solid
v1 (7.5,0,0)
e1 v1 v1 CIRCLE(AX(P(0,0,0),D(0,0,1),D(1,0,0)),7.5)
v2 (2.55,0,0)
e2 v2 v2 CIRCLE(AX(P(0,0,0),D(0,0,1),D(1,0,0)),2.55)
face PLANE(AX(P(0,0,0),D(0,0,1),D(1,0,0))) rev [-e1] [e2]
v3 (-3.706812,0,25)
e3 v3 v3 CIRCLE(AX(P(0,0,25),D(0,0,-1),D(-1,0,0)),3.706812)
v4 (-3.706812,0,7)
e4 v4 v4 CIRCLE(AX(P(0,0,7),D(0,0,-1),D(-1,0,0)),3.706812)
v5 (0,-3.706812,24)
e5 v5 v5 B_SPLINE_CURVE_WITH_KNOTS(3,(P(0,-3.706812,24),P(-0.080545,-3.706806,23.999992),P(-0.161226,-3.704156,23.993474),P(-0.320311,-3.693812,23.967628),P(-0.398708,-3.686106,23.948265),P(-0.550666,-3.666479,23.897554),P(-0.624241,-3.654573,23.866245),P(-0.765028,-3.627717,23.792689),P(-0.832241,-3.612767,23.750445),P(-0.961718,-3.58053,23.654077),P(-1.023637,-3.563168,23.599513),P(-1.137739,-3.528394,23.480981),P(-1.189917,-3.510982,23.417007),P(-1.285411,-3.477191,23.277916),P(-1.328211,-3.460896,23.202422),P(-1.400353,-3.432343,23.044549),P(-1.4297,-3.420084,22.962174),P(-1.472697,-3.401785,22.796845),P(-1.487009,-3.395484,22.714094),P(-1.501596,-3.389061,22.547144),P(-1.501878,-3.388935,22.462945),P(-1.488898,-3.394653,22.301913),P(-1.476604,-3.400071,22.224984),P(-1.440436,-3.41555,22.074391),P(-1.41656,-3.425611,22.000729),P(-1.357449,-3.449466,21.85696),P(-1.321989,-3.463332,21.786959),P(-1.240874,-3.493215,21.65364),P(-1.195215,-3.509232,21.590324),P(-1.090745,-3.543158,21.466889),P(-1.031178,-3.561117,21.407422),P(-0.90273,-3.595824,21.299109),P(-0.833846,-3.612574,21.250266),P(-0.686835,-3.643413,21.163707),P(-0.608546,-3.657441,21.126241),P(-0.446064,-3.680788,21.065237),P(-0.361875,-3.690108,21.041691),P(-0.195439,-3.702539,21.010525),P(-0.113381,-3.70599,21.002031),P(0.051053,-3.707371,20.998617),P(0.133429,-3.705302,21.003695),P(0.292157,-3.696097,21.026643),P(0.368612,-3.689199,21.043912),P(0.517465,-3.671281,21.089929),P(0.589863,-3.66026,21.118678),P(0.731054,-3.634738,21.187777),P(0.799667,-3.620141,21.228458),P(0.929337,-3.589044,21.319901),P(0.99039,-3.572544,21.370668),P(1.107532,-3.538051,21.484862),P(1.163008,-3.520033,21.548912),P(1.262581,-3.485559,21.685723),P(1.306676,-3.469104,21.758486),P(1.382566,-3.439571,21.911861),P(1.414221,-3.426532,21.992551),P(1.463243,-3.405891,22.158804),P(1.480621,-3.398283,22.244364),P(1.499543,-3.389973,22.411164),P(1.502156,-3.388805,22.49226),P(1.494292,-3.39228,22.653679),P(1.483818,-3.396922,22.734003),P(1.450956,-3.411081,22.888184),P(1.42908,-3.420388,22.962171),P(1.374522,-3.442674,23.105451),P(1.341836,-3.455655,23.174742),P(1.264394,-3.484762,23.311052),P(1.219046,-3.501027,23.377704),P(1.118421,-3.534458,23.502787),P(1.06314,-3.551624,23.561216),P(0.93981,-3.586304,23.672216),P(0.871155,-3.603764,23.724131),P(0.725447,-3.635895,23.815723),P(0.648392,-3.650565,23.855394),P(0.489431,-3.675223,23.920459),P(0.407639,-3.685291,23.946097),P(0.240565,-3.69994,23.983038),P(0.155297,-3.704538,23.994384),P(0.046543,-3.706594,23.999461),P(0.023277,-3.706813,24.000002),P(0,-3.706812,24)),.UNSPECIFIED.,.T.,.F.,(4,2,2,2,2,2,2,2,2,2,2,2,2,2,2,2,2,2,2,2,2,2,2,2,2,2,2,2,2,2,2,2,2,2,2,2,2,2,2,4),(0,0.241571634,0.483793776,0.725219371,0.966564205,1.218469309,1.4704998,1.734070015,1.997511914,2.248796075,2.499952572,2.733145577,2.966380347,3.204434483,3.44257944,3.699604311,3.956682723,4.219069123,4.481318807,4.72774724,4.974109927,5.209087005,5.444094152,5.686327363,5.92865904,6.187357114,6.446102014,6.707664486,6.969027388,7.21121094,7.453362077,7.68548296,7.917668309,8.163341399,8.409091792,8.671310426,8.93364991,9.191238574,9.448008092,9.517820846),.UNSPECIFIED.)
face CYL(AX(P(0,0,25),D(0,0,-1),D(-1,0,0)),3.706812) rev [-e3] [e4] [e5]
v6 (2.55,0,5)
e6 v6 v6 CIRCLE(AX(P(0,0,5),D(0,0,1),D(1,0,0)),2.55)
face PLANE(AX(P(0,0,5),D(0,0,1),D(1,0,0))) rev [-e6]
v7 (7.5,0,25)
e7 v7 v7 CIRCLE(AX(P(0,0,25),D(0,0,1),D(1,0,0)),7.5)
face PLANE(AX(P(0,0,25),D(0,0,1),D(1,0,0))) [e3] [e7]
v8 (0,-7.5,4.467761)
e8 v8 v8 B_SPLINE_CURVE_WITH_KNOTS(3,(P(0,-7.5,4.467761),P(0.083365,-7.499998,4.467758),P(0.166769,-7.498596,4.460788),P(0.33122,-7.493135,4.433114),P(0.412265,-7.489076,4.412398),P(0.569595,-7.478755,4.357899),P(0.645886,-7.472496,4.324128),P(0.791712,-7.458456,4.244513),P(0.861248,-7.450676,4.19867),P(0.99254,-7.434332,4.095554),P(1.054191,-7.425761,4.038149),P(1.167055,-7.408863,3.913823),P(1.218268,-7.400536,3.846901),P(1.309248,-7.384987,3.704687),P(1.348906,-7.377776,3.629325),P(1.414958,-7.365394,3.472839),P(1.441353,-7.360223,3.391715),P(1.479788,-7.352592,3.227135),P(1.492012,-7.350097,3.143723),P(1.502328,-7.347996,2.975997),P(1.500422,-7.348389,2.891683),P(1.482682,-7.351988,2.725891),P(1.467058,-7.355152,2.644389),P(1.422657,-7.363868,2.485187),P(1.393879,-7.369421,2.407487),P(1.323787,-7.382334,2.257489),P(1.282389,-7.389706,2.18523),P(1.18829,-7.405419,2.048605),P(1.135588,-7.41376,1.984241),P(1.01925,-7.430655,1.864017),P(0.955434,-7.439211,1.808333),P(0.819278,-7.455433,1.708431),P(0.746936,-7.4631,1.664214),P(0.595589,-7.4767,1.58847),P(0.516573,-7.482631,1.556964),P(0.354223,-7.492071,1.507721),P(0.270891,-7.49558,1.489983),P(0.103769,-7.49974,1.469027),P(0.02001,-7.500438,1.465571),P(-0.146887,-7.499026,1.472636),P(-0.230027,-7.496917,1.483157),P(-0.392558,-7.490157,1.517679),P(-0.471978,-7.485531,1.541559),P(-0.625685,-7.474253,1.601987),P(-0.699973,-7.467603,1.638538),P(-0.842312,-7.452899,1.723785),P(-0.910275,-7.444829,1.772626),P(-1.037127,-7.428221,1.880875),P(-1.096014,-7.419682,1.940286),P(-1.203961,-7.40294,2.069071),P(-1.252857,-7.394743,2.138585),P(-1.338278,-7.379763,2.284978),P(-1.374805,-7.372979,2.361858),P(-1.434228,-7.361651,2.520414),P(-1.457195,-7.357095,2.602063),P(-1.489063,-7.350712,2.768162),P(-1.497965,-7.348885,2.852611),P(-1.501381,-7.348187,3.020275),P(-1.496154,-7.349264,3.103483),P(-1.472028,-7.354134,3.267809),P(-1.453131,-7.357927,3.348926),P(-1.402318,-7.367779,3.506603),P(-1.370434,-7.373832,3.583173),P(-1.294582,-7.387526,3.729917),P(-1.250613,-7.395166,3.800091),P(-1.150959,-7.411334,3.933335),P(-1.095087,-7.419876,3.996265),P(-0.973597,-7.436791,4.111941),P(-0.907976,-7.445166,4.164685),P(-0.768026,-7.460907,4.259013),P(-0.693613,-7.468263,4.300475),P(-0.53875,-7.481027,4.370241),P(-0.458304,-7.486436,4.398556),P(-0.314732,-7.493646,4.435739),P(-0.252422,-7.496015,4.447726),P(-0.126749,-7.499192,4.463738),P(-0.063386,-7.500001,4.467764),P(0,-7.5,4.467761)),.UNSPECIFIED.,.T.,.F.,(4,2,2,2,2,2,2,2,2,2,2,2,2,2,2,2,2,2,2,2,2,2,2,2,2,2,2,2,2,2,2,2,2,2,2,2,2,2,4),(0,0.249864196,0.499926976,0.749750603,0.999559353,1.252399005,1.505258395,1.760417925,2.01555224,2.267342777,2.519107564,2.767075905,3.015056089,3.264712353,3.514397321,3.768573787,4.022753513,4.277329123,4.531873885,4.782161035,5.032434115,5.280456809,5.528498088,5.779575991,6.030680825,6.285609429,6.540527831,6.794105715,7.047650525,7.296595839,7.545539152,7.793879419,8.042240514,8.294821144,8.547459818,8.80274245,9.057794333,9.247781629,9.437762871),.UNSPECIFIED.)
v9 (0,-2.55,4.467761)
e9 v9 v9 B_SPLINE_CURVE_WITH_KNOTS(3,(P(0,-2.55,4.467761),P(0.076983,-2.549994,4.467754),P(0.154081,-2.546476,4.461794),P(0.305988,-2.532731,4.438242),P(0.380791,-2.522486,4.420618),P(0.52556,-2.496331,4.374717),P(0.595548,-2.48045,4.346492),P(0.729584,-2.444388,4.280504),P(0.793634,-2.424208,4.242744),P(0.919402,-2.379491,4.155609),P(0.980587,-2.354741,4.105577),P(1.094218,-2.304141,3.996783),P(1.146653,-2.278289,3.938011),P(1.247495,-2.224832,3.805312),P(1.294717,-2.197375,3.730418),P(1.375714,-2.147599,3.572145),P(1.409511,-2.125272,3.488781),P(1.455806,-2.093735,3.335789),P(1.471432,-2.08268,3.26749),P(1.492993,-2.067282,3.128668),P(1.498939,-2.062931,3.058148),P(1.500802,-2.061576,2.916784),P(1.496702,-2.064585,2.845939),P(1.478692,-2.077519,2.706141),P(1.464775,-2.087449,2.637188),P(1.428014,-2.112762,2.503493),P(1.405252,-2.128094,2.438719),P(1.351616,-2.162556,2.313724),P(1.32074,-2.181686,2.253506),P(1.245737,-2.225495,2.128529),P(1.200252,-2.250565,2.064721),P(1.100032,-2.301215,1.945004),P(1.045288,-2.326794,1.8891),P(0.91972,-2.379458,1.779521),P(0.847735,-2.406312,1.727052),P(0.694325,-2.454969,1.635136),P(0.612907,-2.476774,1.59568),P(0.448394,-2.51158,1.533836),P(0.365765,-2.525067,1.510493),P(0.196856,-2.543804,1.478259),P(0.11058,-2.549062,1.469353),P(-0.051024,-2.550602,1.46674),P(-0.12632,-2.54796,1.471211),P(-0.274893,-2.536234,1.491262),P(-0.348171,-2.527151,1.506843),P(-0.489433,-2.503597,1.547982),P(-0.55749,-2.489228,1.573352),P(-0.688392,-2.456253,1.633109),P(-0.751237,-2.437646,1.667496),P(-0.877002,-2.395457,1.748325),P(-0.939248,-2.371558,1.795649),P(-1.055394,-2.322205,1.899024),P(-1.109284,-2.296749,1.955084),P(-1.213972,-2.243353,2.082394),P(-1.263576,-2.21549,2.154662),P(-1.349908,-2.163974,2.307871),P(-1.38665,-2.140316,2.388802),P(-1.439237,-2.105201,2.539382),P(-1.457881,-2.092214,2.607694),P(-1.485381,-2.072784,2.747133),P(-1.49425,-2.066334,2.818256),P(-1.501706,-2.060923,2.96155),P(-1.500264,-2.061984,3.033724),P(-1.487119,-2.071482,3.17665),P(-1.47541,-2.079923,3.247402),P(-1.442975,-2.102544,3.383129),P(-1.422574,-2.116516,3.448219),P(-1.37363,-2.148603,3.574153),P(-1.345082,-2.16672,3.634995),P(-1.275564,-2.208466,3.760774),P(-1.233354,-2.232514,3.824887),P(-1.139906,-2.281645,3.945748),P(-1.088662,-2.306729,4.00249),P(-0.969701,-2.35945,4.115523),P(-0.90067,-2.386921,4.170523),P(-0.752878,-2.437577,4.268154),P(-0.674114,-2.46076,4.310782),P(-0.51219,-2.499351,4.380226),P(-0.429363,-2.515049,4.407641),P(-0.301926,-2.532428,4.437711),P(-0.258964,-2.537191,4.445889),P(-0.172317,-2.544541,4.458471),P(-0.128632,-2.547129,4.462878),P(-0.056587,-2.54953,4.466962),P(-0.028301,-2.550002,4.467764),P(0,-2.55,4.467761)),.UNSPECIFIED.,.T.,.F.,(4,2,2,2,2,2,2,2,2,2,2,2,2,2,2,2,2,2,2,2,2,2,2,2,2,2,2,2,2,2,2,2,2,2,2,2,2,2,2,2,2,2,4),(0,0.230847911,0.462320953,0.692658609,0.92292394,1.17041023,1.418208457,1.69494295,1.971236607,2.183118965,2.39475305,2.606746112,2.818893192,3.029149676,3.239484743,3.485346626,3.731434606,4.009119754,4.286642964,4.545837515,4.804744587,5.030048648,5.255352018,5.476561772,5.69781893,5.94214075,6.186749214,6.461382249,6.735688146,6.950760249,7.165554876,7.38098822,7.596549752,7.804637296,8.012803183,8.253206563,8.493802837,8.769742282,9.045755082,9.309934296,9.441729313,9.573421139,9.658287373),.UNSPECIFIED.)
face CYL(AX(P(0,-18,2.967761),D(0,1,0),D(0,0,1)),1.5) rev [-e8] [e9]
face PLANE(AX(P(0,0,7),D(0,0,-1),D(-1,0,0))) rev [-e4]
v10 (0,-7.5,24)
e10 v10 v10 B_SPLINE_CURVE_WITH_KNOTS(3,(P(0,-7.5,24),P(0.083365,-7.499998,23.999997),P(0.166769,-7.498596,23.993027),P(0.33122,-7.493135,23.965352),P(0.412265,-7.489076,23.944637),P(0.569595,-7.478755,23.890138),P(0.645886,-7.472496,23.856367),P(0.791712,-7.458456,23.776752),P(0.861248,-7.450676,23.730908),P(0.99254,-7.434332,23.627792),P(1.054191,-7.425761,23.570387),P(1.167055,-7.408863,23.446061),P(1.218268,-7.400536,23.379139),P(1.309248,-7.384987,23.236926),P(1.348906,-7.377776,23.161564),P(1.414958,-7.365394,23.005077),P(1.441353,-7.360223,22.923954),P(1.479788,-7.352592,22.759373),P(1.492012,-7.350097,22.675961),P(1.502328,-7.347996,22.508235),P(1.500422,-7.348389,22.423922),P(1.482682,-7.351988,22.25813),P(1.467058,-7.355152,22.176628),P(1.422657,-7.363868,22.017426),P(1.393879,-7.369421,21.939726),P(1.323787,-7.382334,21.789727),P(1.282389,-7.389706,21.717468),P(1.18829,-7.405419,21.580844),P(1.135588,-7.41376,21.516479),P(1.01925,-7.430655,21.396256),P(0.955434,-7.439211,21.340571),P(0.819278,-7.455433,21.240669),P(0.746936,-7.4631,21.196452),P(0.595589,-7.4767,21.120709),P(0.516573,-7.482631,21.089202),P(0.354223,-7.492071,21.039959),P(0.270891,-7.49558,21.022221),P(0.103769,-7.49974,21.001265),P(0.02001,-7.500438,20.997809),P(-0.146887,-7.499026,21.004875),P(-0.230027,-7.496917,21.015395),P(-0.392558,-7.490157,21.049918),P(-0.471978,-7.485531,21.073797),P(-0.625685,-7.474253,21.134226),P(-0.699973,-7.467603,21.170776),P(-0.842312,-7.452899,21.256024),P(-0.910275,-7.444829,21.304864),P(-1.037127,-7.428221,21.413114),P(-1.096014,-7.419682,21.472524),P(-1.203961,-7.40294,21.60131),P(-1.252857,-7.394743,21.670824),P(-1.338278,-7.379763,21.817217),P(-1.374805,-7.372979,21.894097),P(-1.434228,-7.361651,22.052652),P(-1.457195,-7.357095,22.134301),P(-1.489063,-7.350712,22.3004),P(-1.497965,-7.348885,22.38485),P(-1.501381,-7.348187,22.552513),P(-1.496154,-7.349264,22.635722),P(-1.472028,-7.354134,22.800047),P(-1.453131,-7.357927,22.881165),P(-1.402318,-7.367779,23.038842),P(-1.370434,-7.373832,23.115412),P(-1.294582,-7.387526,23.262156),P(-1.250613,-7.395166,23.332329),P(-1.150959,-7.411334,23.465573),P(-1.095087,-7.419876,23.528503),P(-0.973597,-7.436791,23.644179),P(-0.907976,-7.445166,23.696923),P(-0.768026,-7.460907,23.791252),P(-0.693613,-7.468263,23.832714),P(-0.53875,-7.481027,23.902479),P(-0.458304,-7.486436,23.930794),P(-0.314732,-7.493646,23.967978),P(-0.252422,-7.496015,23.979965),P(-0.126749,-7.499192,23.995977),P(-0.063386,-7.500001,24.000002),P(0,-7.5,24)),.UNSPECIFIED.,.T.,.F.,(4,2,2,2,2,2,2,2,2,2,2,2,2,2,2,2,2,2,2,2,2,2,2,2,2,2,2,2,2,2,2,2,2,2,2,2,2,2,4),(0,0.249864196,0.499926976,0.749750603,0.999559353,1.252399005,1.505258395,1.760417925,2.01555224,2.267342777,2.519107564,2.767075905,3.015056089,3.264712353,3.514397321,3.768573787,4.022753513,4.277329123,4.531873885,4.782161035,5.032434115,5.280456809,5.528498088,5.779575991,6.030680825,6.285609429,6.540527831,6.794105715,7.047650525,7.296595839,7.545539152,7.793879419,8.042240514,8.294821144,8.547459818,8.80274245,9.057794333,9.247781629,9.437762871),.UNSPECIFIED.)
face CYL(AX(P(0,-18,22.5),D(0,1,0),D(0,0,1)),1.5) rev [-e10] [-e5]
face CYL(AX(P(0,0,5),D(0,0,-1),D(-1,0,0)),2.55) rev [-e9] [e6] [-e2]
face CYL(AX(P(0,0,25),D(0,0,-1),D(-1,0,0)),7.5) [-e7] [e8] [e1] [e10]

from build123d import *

# Parameters (mm, degrees)
ESBO_O1_R                 = 7.5
RESSALTO_EXTRUS_O1_DEPTH  = 25
ESBO_O2_R                 = 2.55
CORTE_EXTRUS_O1_DEPTH     = 5
CORTE_EXTRUS_O2_START     = 7
CORTE_EXTRUS_O2_OUTLINE_R = 3.706811579
CORTE_EXTRUS_O2_DEPTH     = 18
ESBO_O3_R                 = 1.5
CORTE_EXTRUS_O3_DEPTH     = 18


# Read off the part's stored shape, not the designer's step: Corte-extrusão2
with BuildPart() as part:
    # Esboço1 → Ressalto-extrusão1 (new body)
    with BuildSketch(Plane.XY):
        Circle(ESBO_O1_R)
    extrude(amount=RESSALTO_EXTRUS_O1_DEPTH)

    # Esboço2 → Corte-extrusão1 (cut)
    with BuildSketch(Plane.XY):
        Circle(ESBO_O2_R)
    extrude(amount=CORTE_EXTRUS_O1_DEPTH, mode=Mode.SUBTRACT)

    # Corte-extrusão2 outline → Corte-extrusão2 (cut)
    with BuildSketch(Plane.XY.offset(CORTE_EXTRUS_O2_START)):
        Circle(CORTE_EXTRUS_O2_OUTLINE_R)
    extrude(amount=CORTE_EXTRUS_O2_DEPTH, mode=Mode.SUBTRACT)

    # Esboço3 → Corte-extrusão3 (cut)
    with BuildSketch(Plane(origin=(0, 0, 0), x_dir=(1, 0, 0), z_dir=(0, 1, 0))):
        with Locations(Location((0, -2.967761403, 0), (0, 0, 270))):
            Circle(ESBO_O3_R)
        with Locations(Location((0, -22.5, 0), (0, 0, 270))):
            Circle(ESBO_O3_R)
    extrude(amount=-CORTE_EXTRUS_O3_DEPTH, mode=Mode.SUBTRACT)


solid = part.part
